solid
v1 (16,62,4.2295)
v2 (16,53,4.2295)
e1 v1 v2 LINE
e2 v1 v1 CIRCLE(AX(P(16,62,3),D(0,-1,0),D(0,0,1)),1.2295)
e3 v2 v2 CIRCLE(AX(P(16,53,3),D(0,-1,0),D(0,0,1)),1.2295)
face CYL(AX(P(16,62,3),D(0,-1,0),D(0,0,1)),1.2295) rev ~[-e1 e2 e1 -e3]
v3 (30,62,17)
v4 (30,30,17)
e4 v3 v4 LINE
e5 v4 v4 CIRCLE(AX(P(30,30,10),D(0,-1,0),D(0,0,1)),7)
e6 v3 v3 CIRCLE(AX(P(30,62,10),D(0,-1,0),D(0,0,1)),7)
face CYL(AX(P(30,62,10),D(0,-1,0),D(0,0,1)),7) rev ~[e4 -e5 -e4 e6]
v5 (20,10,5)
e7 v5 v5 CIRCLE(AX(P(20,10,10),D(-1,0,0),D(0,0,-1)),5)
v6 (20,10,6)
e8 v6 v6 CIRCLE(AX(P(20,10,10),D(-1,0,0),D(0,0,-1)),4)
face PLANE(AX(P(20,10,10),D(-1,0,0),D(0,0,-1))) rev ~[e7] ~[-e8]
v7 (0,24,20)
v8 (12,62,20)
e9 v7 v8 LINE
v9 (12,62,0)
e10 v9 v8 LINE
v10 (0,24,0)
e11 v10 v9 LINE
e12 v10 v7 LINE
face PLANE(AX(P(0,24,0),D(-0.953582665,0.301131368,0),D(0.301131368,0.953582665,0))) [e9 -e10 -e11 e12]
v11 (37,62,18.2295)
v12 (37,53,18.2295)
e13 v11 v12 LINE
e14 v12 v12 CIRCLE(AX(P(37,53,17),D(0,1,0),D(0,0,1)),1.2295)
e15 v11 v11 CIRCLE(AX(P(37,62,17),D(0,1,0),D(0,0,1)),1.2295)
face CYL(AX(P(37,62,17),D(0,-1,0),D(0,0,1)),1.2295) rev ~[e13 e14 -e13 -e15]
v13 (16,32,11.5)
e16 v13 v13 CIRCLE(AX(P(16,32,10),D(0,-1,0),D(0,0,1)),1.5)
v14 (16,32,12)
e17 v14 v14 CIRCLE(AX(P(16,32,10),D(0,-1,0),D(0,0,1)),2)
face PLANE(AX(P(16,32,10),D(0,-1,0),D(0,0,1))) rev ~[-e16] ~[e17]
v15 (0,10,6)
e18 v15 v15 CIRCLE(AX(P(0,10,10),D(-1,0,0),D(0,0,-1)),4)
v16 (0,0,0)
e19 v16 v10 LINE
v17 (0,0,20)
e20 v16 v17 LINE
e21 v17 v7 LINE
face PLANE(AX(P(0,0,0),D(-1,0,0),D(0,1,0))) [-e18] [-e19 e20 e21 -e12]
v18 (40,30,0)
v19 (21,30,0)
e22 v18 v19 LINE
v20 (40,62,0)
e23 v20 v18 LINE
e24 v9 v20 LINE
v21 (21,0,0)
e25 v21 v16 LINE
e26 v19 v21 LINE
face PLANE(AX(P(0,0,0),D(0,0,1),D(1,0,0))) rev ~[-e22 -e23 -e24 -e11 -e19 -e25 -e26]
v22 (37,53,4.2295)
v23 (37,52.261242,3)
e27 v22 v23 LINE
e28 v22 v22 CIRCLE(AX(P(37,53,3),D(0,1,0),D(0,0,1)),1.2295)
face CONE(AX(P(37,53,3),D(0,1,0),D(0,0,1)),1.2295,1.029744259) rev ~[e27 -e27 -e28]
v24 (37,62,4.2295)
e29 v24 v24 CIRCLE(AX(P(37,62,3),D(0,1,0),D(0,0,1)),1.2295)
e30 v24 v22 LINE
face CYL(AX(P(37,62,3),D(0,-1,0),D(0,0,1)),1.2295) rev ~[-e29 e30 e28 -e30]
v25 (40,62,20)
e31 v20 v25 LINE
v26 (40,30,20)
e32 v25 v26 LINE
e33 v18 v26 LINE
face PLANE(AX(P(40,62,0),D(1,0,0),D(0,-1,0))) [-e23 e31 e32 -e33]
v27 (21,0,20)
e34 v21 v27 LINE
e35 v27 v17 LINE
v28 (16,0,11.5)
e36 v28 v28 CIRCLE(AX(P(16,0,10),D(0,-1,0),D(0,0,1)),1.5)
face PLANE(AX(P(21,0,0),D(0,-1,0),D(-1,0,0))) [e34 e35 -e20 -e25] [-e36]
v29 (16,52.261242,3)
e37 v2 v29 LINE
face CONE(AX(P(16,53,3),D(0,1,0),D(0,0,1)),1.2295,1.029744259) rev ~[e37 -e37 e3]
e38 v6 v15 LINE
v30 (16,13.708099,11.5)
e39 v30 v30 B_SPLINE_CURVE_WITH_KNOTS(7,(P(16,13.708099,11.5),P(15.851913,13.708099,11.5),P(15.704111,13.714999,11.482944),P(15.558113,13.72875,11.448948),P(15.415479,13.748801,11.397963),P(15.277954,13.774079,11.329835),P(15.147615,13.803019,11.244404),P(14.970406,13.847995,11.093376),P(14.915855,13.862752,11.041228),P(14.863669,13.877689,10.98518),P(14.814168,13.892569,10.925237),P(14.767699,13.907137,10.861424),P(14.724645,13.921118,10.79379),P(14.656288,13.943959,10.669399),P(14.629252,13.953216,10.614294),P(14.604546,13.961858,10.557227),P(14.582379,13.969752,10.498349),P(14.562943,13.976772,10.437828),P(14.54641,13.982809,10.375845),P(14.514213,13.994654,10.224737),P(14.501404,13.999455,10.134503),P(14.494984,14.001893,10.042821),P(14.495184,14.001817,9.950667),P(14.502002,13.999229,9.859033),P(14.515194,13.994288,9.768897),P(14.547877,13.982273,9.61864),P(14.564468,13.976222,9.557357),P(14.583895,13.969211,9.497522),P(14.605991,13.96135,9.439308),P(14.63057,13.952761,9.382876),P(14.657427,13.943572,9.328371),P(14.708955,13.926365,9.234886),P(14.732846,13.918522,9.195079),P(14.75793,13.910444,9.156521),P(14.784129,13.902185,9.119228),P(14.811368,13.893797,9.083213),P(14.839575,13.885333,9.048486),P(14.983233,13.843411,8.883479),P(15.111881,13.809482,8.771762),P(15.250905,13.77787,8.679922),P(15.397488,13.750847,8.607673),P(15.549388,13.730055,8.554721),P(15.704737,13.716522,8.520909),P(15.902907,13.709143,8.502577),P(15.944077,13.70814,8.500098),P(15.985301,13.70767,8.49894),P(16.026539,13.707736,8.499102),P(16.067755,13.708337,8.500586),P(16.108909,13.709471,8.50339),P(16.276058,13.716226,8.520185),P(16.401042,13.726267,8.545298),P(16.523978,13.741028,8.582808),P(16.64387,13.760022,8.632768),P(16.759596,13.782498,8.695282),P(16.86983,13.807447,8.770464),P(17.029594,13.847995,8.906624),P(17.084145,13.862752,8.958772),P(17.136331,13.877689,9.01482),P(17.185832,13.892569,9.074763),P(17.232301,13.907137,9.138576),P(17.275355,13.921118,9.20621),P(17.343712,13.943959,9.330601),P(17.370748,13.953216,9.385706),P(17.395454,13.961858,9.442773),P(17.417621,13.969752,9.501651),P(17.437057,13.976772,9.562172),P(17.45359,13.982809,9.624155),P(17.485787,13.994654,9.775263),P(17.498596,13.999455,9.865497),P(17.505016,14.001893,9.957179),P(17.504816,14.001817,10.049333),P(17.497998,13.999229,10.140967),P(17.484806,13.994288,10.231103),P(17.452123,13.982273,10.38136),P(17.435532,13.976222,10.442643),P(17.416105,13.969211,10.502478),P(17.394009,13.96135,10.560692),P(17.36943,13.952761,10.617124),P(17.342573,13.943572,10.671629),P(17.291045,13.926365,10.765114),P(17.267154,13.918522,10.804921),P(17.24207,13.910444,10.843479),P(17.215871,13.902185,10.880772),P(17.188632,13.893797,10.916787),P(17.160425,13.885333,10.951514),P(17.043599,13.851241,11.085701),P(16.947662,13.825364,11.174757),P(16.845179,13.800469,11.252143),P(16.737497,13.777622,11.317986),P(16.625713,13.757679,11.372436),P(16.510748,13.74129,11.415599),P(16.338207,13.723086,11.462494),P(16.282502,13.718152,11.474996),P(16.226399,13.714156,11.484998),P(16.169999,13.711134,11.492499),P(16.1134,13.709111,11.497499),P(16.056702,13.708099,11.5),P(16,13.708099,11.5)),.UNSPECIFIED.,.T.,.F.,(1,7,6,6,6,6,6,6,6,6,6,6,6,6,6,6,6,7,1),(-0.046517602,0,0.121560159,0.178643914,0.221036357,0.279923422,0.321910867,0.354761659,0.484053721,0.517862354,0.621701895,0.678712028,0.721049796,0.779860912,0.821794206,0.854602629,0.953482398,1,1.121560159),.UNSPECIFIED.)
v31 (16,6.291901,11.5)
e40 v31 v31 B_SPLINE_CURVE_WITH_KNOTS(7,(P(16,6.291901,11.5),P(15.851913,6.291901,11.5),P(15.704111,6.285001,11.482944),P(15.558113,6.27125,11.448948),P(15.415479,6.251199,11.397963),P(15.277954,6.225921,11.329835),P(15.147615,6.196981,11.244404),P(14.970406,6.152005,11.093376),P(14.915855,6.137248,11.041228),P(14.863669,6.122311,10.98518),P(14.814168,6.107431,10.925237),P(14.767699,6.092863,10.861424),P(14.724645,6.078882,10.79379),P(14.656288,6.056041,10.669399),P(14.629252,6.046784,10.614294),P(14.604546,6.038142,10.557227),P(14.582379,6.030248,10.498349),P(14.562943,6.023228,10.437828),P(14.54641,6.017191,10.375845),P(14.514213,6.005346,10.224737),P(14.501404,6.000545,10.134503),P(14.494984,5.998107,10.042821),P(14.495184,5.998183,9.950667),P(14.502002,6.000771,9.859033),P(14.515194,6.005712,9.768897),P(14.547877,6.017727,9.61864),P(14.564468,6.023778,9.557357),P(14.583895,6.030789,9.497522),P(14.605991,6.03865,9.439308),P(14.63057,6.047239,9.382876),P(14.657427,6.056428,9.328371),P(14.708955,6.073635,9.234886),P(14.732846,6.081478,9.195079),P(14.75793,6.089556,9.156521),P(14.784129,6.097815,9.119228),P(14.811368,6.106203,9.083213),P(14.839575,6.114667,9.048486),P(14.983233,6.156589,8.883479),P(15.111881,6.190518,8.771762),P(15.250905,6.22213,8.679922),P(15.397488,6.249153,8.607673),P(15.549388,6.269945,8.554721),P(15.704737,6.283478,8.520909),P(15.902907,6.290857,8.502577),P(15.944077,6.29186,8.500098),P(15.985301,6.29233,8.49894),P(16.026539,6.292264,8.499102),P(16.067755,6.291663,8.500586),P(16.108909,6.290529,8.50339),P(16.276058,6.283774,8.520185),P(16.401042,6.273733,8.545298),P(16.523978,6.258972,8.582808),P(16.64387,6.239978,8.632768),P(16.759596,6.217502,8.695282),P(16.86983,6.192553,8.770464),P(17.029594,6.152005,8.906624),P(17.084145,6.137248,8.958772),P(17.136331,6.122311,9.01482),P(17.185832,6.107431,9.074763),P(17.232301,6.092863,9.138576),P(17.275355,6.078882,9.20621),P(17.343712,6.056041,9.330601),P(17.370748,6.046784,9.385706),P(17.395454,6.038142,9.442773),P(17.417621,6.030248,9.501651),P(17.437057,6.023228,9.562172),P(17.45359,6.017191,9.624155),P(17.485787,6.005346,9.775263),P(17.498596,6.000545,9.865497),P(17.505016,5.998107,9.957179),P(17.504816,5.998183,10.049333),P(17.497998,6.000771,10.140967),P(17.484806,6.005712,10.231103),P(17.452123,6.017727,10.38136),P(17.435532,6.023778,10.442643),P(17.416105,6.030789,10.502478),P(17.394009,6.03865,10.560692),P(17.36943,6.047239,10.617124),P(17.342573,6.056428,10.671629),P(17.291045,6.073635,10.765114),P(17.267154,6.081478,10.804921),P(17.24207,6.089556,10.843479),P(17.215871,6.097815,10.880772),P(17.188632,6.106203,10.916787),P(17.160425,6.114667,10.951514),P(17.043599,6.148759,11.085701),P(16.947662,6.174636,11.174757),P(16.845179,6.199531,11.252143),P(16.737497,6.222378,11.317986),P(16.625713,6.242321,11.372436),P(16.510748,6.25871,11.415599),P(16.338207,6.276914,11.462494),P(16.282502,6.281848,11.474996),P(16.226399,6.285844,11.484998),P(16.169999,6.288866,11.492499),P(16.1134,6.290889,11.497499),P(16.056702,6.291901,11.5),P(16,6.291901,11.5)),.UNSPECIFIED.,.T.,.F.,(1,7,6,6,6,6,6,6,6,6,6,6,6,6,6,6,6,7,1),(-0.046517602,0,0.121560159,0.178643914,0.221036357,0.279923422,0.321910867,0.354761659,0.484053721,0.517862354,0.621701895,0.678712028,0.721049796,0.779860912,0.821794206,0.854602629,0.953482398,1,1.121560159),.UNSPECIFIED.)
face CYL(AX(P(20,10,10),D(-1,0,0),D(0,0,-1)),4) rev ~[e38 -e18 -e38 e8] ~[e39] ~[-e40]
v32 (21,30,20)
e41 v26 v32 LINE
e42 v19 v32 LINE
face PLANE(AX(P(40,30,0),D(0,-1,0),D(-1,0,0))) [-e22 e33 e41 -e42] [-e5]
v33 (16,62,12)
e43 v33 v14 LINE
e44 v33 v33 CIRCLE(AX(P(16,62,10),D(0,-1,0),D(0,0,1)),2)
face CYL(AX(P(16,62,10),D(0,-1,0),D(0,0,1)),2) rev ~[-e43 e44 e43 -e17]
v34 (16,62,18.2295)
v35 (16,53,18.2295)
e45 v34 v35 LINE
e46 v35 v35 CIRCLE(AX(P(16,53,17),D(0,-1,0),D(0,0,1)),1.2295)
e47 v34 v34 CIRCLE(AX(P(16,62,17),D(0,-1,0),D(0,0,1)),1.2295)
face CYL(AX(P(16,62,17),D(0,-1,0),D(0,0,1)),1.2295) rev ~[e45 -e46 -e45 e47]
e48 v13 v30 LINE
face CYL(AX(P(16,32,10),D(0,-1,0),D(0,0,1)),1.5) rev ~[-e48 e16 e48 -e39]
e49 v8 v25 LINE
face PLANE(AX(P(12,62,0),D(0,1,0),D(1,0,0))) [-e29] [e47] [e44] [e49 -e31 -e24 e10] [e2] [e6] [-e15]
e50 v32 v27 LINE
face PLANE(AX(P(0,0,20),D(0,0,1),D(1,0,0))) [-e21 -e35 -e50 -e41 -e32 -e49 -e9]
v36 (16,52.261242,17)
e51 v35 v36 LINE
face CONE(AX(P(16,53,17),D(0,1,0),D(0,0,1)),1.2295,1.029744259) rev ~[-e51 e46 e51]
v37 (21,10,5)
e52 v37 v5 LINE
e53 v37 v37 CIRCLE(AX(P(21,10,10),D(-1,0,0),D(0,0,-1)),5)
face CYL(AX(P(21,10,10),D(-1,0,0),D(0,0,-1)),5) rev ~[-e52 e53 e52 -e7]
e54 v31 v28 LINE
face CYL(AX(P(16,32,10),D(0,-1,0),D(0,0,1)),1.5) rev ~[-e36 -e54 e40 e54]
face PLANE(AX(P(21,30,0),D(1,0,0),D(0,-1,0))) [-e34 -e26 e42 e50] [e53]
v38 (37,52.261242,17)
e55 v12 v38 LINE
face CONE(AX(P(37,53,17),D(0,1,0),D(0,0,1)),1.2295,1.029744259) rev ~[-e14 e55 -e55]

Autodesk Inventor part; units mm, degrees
ref_plane "XY Plane" through (0, 0, 0) normal (0, 0, 1) x (1, 0, 0)
sketch "Skizze1" plane through (0, 0, 0) normal (0, 0, 1) x (1, 0, 0)
  line L0 (0, 0) -> (0, 24)
  line L1 (0, 24) -> (12, 62)
  line L2 (12, 62) -> (40, 62)
  line L3 (40, 62) -> (40, 30)
  line L4 (40, 30) -> (21, 30)
  line L5 (21, 30) -> (21, 0)
  line L6 (21, 0) -> (0, 0)
  dimension "d0" = 62
  dimension "d1" = 21
  dimension "d2" = 30
  dimension "d3" = 38
  dimension "d4" = 28
  dimension "d5" = 12
extrude "Extrusion1" add sketch "Skizze1" along normal blind 20
sketch "Skizze3" plane through (12, 62, 0) normal (0, 1, 0) x (1, 0, 0)
  line L0 (0, 0) -> (0, -20) projected
  line L1 (28, 0) -> (28, -20) projected
  point P0 (-12, 0)
  point P1 (18, -10)
  point P2 (28, -10)
  dimension "d16" = 10
hole "Bohrung2" at (30, 62, 10) direction (0, -1, 0) diameter 14 end through all
sketch "Skizze4" plane through (12, 62, 0) normal (0, 1, 0) x (1, 0, 0)
  line L0 (0, 0) -> (0, -20) projected
  line L1 (28, 0) -> (28, -20) projected
  point P0 (-12, 0)
  point P1 (4, -10)
  point P2 (28, -10)
  dimension "d24" = 4
hole "Bohrung3" at (16, 62, 10) direction (0, -1, 0) diameter 3 depth 62 counterbore diameter 4 counterbore depth 30
sketch "Skizze5" plane through (21, 0, 0) normal (1, 0, 0) x (0, 0, -1)
  line L0 (0, 0) -> (-20, 0) projected
  point P0 (-10, 10)
  point P1 (-10, 0)
  dimension "d32" = 10
hole "Bohrung4" at (21, 10, 10) direction (-1, 0, 0) diameter 8 depth 21 counterbore diameter 10 counterbore depth 1
ref_plane "Arbeitsebene1" through (0, 12, 0) normal (0, 1, 0) x (-1, 0, 0)
sketch "Skizze8" plane through (12, 62, 0) normal (0, 1, 0) x (1, 0, 0)
  circle A0 centre (4, -10) radius 2 projected
  circle A1 centre (18, -10) radius 7 projected
  line L0 (28, 0) -> (0, 0) projected
  line L1 (0, 0) -> (0, -20) projected
  line L2 (28, -20) -> (0, -20) projected
  line L3 (28, 0) -> (28, -20) projected
  line L4 (4, -10) -> (4, -3) construction
  line L5 (4, -10) -> (4, -17) construction
  line L6 (18, -10) -> (9, -10) construction
  line L7 (9, 0) -> (9, -20) projected
  point P0 (-12, 0)
  dimension "d57" = 14
hole "Bohrung7" at (16, 62, 17) at (16, 62, 3) direction (0, -1, 0) diameter 2.459 depth 9 tip angle 118 thread size "M3x0.5" class "6H" standard "ISO Metric profile"
ref_plane "Arbeitsebene2" through (26.5, 0, 0) normal (1, 0, 0) x (0, 1, 0)
mirror "Spiegeln2" about plane through (26.5, 0, 0) normal (1, 0, 0) of "Bohrung7"
properties part number "MotorBlock" material "Glas"
